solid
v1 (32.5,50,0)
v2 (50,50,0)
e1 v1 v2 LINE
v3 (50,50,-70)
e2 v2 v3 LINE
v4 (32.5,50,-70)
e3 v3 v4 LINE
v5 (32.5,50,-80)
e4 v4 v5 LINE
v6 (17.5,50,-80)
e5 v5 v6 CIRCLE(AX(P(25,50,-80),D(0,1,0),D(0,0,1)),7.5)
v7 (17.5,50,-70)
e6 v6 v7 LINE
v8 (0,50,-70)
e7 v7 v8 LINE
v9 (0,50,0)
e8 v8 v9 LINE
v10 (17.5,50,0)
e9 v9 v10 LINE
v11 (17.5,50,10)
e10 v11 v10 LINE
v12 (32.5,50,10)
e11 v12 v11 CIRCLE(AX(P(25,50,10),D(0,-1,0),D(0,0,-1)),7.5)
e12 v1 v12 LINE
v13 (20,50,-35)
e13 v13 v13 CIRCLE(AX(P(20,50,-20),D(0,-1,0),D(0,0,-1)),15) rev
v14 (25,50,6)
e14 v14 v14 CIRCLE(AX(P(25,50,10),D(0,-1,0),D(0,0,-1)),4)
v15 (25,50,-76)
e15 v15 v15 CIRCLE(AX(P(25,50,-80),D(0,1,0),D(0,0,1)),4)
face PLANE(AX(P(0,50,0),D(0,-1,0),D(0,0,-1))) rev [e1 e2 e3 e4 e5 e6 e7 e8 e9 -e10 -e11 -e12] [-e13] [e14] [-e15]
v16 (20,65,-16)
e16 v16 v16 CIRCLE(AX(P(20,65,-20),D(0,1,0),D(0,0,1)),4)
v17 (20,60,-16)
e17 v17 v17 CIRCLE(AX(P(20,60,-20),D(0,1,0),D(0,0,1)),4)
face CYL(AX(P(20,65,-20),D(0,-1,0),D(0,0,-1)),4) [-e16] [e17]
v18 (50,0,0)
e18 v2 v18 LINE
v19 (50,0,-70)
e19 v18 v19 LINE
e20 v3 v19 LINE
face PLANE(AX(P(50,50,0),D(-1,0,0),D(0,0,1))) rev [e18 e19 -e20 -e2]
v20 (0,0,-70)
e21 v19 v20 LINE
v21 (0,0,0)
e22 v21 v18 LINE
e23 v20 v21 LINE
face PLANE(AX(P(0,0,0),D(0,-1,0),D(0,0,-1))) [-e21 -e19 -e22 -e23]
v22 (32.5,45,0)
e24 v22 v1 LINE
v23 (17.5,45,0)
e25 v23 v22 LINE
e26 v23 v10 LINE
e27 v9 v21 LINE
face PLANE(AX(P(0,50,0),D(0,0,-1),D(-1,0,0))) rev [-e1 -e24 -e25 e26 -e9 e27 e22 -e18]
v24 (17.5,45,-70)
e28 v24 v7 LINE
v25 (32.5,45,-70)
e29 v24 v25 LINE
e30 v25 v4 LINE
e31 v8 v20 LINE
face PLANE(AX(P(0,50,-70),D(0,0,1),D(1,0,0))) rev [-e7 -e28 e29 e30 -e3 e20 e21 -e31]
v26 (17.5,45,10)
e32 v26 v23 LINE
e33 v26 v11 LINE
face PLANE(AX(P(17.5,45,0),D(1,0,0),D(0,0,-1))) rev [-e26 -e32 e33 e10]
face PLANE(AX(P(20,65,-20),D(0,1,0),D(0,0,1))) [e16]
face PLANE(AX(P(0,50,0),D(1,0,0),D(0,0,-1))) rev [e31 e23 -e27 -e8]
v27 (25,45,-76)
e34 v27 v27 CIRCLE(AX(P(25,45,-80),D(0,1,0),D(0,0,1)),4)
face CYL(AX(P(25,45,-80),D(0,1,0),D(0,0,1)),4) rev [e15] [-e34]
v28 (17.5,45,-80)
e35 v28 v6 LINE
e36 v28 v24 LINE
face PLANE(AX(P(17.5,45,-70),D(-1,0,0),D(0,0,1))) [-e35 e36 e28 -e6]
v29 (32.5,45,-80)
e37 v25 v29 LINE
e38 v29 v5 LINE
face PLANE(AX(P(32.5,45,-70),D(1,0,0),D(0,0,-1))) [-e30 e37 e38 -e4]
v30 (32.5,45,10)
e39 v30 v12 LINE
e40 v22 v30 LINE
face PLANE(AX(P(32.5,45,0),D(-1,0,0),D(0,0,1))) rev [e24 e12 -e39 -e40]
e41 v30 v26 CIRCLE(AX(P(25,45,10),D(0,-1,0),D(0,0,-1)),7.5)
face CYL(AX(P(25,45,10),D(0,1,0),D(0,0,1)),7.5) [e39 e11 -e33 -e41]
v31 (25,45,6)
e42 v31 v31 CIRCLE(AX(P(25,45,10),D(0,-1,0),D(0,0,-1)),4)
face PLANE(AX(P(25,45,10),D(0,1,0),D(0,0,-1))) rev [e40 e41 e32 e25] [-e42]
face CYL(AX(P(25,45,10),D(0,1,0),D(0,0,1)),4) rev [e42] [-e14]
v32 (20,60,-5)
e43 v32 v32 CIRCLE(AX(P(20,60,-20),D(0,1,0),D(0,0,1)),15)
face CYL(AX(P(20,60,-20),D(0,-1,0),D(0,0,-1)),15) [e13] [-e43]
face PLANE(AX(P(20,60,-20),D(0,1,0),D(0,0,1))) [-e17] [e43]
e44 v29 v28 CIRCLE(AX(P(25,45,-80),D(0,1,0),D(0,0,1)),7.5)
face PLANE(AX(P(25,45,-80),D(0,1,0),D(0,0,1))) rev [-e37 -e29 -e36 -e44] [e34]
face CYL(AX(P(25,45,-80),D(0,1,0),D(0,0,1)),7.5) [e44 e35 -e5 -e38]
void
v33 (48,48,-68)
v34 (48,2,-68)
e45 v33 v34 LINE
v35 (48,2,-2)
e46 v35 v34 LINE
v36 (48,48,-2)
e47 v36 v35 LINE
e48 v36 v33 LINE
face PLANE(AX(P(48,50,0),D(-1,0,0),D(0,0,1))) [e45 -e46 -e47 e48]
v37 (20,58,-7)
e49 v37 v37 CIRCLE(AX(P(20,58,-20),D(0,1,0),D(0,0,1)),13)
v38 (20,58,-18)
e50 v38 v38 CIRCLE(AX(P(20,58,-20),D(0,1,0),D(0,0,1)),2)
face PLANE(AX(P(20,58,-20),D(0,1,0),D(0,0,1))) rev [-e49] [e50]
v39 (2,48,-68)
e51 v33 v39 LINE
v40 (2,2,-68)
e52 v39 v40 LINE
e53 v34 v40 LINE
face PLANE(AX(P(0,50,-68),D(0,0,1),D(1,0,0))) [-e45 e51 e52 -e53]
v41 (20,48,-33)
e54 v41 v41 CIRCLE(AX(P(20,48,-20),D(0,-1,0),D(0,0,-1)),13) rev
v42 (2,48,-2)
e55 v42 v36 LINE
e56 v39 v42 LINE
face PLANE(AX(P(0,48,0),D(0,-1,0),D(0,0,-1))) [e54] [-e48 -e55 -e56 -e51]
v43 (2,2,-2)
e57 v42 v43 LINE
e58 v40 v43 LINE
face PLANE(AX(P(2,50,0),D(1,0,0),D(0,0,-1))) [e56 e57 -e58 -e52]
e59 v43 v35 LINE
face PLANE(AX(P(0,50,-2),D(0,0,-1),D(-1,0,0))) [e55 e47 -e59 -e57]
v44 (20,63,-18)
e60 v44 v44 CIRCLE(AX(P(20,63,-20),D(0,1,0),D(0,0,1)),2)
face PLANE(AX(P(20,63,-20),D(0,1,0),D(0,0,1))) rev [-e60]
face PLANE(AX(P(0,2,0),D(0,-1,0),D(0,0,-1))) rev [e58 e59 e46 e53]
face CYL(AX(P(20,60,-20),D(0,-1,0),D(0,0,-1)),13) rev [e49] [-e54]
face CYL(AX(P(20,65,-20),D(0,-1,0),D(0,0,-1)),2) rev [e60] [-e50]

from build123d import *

# Parameters (mm, degrees)
SKETCH1_W           = 50
SKETCH1_H           = 70
BOSS_EXTRUDE1_DEPTH = 50
SKETCH2_R           = 15
BOSS_EXTRUDE2_DEPTH = 10
SKETCH3_R           = 4
BOSS_EXTRUDE3_DEPTH = 5
SHELL7_START        = 2
SHELL7_OUTLINE_W    = 46
SHELL7_OUTLINE_H    = 66
SHELL7_DEPTH        = 46
SHELL7_START_2      = 48
SHELL7_2_OUTLINE_R  = 13
SHELL7_2_DEPTH      = 10
SHELL7_START_3      = 58
SHELL7_3_OUTLINE_R  = 2
SHELL7_3_DEPTH      = 5
SKETCH4_R           = 4
BOSS_EXTRUDE4_DEPTH = 5


# Read off the part's stored shape, not the designer's step: Shell7
with BuildPart() as part:
    # Sketch1 → Boss-Extrude1 (new body)
    with BuildSketch(Plane(origin=(0, 0, 0), x_dir=(1, 0, 0), z_dir=(0, 1, 0))):
        with Locations((25, 35)):
            Rectangle(SKETCH1_W, SKETCH1_H)
    extrude(amount=BOSS_EXTRUDE1_DEPTH)

    # Sketch2 → Boss-Extrude2 (add)
    with BuildSketch(Plane(origin=(0, 50, 0), x_dir=(1, 0, 0), z_dir=(0, 1, 0))):
        with Locations(Location((20, 20, 0), (0, 0, 90))):
            Circle(SKETCH2_R)
    extrude(amount=BOSS_EXTRUDE2_DEPTH)

    # Sketch3 → Boss-Extrude3 (add)
    with BuildSketch(Plane(origin=(0, 60, 0), x_dir=(1, 0, 0), z_dir=(0, 1, 0))):
        with Locations(Location((20, 20, 0), (0, 0, 270))):
            Circle(SKETCH3_R)
    extrude(amount=BOSS_EXTRUDE3_DEPTH)

    # Shell7 outline → Shell7 (cut)
    with BuildSketch(Plane(origin=(0, 0, 0), x_dir=(1, 0, 0), z_dir=(0, 1, 0)).offset(SHELL7_START)):
        with Locations((25, 35)):
            Rectangle(SHELL7_OUTLINE_W, SHELL7_OUTLINE_H)
    extrude(amount=SHELL7_DEPTH, mode=Mode.SUBTRACT)

    # Shell7 2 outline → Shell7 2 (cut)
    with BuildSketch(Plane(origin=(0, 0, 0), x_dir=(1, 0, 0), z_dir=(0, 1, 0)).offset(SHELL7_START_2)):
        with Locations((20, 20)):
            Circle(SHELL7_2_OUTLINE_R)
    extrude(amount=SHELL7_2_DEPTH, mode=Mode.SUBTRACT)

    # Shell7 3 outline → Shell7 3 (cut)
    with BuildSketch(Plane(origin=(0, 0, 0), x_dir=(1, 0, 0), z_dir=(0, 1, 0)).offset(SHELL7_START_3)):
        with Locations((20, 20)):
            Circle(SHELL7_3_OUTLINE_R)
    extrude(amount=SHELL7_3_DEPTH, mode=Mode.SUBTRACT)

    # Sketch4 → Boss-Extrude4 (add)
    with BuildSketch(Plane(origin=(0, 50, 0), x_dir=(1, 0, 0), z_dir=(0, 1, 0))):
        with BuildLine():
            Line((17.5, 70), (32.5, 70))
            Line((32.5, 70), (32.5, 80))
            ThreePointArc((32.5, 80), (25, 87.5), (17.5, 80))
            Line((17.5, 80), (17.5, 70))
        make_face()
        with Locations(Location((25, 80, 0), (0, 0, 270))):
            Circle(SKETCH4_R, mode=Mode.SUBTRACT)
    boss_extrude4 = extrude(amount=-BOSS_EXTRUDE4_DEPTH)

    # Mirror1: Boss-Extrude4 across plane
    add(boss_extrude4.mirror(Plane(origin=(0, 0, -35), x_dir=(1, 0, 0), z_dir=(0, 0, -1))))


solid = part.part
